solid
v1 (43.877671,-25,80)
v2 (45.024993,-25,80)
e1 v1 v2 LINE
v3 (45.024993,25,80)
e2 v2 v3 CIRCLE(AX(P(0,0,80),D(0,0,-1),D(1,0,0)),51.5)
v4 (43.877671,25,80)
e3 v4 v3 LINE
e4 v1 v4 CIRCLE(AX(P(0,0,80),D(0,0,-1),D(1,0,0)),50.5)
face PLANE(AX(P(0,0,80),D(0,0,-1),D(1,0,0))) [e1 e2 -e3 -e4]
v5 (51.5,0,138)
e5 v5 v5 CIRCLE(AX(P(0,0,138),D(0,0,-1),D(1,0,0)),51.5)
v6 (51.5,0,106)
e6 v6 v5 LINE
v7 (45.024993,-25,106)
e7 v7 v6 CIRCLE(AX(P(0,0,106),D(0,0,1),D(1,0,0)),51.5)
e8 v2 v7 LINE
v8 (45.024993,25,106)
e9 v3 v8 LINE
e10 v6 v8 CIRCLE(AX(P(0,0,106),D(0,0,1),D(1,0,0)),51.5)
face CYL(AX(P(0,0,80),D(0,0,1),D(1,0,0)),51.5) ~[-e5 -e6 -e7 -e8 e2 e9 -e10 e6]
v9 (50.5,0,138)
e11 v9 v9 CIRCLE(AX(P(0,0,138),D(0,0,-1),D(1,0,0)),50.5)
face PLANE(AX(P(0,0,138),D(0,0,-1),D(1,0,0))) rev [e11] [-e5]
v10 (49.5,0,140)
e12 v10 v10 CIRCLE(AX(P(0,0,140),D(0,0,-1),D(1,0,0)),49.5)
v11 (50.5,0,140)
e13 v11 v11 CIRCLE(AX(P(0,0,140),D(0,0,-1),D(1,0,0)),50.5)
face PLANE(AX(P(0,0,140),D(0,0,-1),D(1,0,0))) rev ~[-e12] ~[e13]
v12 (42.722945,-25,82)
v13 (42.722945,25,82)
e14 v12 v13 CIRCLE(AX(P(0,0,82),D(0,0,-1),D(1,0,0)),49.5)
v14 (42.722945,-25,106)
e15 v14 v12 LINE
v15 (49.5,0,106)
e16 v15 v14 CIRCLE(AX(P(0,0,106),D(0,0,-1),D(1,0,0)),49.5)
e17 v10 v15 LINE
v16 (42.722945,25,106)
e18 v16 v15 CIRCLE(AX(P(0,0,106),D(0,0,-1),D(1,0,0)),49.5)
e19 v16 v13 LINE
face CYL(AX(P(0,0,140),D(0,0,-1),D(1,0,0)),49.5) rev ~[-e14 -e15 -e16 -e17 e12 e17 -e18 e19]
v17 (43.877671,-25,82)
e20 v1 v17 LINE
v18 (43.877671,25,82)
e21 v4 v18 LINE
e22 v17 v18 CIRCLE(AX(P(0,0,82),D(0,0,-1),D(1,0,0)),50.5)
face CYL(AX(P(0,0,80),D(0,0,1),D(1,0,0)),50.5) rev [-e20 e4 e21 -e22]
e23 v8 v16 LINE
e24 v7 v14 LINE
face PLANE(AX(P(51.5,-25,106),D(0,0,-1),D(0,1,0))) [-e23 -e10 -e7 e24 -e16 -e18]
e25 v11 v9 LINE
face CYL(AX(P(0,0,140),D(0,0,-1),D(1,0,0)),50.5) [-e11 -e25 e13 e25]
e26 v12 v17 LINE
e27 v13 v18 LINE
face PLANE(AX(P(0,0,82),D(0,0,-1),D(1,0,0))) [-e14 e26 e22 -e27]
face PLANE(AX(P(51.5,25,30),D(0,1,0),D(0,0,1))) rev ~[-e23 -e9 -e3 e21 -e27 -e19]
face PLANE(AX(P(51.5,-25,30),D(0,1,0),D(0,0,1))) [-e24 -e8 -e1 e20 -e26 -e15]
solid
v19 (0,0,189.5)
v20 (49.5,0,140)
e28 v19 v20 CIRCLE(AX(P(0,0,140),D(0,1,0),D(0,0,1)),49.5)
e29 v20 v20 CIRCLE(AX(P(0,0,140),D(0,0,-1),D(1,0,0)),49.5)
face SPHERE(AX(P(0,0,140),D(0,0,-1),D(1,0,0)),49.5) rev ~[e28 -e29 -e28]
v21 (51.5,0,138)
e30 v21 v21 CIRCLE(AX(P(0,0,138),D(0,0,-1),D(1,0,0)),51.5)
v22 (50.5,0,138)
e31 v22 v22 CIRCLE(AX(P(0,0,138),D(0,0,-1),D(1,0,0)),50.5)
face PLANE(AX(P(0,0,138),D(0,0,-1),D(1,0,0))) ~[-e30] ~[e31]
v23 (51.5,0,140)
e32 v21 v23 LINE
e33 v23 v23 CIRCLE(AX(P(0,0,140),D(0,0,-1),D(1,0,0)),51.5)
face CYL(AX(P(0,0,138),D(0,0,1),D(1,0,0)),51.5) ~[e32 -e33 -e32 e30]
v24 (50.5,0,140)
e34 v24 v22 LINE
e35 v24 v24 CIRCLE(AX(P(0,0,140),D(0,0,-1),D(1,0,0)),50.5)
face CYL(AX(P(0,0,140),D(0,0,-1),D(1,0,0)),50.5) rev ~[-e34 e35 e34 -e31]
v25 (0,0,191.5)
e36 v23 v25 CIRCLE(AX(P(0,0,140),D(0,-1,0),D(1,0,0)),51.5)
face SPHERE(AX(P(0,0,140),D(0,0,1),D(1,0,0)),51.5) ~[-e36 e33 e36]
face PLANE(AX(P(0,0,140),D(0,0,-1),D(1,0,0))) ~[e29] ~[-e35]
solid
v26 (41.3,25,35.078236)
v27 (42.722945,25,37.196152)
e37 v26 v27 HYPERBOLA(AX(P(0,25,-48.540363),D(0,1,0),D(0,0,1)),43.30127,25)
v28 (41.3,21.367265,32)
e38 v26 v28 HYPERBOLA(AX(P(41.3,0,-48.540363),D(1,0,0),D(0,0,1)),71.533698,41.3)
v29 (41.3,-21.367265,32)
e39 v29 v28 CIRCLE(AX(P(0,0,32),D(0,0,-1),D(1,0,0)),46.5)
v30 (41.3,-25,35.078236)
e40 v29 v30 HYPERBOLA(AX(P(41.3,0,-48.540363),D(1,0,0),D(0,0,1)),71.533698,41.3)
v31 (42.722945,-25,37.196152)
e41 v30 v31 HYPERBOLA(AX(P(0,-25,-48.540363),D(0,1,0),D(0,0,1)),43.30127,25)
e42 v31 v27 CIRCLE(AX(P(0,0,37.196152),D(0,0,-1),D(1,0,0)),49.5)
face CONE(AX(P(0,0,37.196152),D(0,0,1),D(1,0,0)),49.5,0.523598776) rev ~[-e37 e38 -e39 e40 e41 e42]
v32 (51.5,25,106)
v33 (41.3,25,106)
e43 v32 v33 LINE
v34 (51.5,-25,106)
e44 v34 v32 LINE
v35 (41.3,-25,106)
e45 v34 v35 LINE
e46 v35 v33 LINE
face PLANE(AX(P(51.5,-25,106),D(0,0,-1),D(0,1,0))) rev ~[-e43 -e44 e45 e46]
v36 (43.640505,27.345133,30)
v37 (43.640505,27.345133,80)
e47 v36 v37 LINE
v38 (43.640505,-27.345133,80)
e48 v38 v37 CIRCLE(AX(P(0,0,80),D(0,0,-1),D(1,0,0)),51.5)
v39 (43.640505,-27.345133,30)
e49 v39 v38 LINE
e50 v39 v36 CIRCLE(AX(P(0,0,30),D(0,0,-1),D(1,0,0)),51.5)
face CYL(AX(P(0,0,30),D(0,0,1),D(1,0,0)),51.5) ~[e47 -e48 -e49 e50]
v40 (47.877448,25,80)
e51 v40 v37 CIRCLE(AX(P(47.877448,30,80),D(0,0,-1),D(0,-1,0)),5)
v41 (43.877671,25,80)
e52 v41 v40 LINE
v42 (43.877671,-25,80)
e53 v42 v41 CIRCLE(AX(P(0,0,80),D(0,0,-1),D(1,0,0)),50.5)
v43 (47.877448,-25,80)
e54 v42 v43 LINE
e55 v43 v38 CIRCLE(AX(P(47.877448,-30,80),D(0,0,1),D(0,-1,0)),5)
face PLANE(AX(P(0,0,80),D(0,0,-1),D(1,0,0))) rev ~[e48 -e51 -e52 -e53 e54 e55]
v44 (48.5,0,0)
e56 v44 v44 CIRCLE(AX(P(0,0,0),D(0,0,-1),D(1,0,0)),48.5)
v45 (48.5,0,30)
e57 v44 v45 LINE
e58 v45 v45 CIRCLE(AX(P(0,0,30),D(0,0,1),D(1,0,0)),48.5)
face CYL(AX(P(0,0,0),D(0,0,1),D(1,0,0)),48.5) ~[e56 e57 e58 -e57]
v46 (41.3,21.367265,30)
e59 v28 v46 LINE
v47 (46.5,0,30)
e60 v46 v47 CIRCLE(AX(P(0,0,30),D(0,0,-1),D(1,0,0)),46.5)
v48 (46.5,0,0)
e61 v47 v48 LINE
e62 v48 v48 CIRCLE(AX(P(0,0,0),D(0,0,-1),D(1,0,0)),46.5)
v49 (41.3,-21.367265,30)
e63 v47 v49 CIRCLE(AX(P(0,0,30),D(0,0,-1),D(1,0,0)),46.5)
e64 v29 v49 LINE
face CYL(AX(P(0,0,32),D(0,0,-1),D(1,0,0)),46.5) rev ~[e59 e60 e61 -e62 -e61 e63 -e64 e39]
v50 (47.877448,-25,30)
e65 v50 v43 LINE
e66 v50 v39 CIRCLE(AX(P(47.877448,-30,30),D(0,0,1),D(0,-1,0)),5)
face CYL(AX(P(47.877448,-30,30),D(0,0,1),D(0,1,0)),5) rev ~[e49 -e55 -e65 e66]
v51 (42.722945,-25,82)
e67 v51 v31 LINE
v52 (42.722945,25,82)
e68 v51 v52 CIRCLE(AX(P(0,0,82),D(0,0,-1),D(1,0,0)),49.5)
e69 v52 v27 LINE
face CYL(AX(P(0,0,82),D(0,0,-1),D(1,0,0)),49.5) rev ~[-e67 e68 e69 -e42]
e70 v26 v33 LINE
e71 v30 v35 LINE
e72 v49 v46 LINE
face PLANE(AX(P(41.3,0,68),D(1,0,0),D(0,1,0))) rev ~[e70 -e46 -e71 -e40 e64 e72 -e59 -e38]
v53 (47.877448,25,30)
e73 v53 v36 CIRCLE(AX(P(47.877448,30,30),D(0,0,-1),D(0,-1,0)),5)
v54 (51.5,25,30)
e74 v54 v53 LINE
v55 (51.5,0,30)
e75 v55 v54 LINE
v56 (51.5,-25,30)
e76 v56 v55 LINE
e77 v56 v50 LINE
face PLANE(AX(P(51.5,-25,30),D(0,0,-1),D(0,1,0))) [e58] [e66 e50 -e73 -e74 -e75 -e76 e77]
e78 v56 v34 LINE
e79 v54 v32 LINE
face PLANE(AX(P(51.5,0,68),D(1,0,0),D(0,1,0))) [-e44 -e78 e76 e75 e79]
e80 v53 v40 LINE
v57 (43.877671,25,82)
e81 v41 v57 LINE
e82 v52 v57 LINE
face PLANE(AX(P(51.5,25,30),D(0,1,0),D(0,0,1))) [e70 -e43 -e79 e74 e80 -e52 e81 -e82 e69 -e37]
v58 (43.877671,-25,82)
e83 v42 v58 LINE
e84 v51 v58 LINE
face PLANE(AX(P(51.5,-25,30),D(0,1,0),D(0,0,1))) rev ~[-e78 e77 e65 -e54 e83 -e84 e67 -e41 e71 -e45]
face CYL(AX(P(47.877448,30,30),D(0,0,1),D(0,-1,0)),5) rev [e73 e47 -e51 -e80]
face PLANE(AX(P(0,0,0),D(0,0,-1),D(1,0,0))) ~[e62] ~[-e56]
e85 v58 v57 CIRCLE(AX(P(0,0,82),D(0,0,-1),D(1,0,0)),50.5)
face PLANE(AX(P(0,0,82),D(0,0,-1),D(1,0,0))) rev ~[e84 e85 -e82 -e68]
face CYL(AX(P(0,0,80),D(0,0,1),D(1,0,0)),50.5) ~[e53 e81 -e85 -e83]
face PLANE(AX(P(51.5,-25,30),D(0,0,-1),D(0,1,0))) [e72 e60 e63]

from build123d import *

# Parameters (mm, degrees)
F3_W     = 50
F3_H     = 76
F4_DEPTH = 10.2
F11_R    = 5


with BuildPart() as f1:
    # F0 (on Front) → F1 (revolve)
    with BuildSketch(Plane.XZ):
        Polygon((46.5, 32), (46.5, 0), (48.5, 0), (48.5, 30), (51.5, 30), (51.5, 80), (50.5, 80), (50.5, 82), (49.5, 82), (49.5, 37.1961524227), align=None)
    revolve(axis=Axis((0, 0, 67.2105439007), (0, 0, -1)))

    # F3 (on plane+point) → F4 (join)
    with BuildSketch(Plane.YZ.offset(51.5)):
        with Locations((0, 68)):
            Rectangle(F3_W, F3_H)
    extrude(amount=-F4_DEPTH)


with BuildPart() as f6:
    # F5 (on Front) → F6 (revolve)
    with BuildSketch(Plane.XZ):
        Polygon((49.5, 140), (49.5, 82), (50.5, 82), (50.5, 80), (51.5, 80), (51.5, 140), align=None)
    revolve(axis=Axis((0, 0, 67.2105439007), (0, 0, -1)))


with BuildPart() as f8:
    # F7 (on Front) → F8 (revolve)
    with BuildSketch(Plane.XZ):
        with BuildLine():
            Line((50.5, 138), (51.5, 138))
            Line((51.5, 138), (51.5, 140))
            ThreePointArc((51.5, 140), (36.4159992311, 176.4159992311), (0, 191.5))
            Line((0, 191.5), (0, 189.5))
            ThreePointArc((0, 189.5), (35.0017856687, 175.0017856687), (49.5, 140))
            Line((49.5, 140), (50.5, 140))
            Line((50.5, 140), (50.5, 138))
        make_face()
    revolve(axis=Axis((0, 0, 67.2105439007), (0, 0, -1)))


with BuildPart() as f6_1:
    add(f6.part)

    # F9: cut F8
    add(f8.part, mode=Mode.SUBTRACT)

    # F10: cut F1
    add(f1.part, mode=Mode.SUBTRACT)


with BuildPart() as f1_1:
    add(f1.part)

    # F11
    f11_edges = [f1_1.edges().sort_by_distance(p)[0] for p in [
        (45.024993, -25, 55),
        (45.024993, 25, 55),
    ]]
    fillet(f11_edges, radius=F11_R)


solid = Compound([f8.part, f6_1.part, f1_1.part])
